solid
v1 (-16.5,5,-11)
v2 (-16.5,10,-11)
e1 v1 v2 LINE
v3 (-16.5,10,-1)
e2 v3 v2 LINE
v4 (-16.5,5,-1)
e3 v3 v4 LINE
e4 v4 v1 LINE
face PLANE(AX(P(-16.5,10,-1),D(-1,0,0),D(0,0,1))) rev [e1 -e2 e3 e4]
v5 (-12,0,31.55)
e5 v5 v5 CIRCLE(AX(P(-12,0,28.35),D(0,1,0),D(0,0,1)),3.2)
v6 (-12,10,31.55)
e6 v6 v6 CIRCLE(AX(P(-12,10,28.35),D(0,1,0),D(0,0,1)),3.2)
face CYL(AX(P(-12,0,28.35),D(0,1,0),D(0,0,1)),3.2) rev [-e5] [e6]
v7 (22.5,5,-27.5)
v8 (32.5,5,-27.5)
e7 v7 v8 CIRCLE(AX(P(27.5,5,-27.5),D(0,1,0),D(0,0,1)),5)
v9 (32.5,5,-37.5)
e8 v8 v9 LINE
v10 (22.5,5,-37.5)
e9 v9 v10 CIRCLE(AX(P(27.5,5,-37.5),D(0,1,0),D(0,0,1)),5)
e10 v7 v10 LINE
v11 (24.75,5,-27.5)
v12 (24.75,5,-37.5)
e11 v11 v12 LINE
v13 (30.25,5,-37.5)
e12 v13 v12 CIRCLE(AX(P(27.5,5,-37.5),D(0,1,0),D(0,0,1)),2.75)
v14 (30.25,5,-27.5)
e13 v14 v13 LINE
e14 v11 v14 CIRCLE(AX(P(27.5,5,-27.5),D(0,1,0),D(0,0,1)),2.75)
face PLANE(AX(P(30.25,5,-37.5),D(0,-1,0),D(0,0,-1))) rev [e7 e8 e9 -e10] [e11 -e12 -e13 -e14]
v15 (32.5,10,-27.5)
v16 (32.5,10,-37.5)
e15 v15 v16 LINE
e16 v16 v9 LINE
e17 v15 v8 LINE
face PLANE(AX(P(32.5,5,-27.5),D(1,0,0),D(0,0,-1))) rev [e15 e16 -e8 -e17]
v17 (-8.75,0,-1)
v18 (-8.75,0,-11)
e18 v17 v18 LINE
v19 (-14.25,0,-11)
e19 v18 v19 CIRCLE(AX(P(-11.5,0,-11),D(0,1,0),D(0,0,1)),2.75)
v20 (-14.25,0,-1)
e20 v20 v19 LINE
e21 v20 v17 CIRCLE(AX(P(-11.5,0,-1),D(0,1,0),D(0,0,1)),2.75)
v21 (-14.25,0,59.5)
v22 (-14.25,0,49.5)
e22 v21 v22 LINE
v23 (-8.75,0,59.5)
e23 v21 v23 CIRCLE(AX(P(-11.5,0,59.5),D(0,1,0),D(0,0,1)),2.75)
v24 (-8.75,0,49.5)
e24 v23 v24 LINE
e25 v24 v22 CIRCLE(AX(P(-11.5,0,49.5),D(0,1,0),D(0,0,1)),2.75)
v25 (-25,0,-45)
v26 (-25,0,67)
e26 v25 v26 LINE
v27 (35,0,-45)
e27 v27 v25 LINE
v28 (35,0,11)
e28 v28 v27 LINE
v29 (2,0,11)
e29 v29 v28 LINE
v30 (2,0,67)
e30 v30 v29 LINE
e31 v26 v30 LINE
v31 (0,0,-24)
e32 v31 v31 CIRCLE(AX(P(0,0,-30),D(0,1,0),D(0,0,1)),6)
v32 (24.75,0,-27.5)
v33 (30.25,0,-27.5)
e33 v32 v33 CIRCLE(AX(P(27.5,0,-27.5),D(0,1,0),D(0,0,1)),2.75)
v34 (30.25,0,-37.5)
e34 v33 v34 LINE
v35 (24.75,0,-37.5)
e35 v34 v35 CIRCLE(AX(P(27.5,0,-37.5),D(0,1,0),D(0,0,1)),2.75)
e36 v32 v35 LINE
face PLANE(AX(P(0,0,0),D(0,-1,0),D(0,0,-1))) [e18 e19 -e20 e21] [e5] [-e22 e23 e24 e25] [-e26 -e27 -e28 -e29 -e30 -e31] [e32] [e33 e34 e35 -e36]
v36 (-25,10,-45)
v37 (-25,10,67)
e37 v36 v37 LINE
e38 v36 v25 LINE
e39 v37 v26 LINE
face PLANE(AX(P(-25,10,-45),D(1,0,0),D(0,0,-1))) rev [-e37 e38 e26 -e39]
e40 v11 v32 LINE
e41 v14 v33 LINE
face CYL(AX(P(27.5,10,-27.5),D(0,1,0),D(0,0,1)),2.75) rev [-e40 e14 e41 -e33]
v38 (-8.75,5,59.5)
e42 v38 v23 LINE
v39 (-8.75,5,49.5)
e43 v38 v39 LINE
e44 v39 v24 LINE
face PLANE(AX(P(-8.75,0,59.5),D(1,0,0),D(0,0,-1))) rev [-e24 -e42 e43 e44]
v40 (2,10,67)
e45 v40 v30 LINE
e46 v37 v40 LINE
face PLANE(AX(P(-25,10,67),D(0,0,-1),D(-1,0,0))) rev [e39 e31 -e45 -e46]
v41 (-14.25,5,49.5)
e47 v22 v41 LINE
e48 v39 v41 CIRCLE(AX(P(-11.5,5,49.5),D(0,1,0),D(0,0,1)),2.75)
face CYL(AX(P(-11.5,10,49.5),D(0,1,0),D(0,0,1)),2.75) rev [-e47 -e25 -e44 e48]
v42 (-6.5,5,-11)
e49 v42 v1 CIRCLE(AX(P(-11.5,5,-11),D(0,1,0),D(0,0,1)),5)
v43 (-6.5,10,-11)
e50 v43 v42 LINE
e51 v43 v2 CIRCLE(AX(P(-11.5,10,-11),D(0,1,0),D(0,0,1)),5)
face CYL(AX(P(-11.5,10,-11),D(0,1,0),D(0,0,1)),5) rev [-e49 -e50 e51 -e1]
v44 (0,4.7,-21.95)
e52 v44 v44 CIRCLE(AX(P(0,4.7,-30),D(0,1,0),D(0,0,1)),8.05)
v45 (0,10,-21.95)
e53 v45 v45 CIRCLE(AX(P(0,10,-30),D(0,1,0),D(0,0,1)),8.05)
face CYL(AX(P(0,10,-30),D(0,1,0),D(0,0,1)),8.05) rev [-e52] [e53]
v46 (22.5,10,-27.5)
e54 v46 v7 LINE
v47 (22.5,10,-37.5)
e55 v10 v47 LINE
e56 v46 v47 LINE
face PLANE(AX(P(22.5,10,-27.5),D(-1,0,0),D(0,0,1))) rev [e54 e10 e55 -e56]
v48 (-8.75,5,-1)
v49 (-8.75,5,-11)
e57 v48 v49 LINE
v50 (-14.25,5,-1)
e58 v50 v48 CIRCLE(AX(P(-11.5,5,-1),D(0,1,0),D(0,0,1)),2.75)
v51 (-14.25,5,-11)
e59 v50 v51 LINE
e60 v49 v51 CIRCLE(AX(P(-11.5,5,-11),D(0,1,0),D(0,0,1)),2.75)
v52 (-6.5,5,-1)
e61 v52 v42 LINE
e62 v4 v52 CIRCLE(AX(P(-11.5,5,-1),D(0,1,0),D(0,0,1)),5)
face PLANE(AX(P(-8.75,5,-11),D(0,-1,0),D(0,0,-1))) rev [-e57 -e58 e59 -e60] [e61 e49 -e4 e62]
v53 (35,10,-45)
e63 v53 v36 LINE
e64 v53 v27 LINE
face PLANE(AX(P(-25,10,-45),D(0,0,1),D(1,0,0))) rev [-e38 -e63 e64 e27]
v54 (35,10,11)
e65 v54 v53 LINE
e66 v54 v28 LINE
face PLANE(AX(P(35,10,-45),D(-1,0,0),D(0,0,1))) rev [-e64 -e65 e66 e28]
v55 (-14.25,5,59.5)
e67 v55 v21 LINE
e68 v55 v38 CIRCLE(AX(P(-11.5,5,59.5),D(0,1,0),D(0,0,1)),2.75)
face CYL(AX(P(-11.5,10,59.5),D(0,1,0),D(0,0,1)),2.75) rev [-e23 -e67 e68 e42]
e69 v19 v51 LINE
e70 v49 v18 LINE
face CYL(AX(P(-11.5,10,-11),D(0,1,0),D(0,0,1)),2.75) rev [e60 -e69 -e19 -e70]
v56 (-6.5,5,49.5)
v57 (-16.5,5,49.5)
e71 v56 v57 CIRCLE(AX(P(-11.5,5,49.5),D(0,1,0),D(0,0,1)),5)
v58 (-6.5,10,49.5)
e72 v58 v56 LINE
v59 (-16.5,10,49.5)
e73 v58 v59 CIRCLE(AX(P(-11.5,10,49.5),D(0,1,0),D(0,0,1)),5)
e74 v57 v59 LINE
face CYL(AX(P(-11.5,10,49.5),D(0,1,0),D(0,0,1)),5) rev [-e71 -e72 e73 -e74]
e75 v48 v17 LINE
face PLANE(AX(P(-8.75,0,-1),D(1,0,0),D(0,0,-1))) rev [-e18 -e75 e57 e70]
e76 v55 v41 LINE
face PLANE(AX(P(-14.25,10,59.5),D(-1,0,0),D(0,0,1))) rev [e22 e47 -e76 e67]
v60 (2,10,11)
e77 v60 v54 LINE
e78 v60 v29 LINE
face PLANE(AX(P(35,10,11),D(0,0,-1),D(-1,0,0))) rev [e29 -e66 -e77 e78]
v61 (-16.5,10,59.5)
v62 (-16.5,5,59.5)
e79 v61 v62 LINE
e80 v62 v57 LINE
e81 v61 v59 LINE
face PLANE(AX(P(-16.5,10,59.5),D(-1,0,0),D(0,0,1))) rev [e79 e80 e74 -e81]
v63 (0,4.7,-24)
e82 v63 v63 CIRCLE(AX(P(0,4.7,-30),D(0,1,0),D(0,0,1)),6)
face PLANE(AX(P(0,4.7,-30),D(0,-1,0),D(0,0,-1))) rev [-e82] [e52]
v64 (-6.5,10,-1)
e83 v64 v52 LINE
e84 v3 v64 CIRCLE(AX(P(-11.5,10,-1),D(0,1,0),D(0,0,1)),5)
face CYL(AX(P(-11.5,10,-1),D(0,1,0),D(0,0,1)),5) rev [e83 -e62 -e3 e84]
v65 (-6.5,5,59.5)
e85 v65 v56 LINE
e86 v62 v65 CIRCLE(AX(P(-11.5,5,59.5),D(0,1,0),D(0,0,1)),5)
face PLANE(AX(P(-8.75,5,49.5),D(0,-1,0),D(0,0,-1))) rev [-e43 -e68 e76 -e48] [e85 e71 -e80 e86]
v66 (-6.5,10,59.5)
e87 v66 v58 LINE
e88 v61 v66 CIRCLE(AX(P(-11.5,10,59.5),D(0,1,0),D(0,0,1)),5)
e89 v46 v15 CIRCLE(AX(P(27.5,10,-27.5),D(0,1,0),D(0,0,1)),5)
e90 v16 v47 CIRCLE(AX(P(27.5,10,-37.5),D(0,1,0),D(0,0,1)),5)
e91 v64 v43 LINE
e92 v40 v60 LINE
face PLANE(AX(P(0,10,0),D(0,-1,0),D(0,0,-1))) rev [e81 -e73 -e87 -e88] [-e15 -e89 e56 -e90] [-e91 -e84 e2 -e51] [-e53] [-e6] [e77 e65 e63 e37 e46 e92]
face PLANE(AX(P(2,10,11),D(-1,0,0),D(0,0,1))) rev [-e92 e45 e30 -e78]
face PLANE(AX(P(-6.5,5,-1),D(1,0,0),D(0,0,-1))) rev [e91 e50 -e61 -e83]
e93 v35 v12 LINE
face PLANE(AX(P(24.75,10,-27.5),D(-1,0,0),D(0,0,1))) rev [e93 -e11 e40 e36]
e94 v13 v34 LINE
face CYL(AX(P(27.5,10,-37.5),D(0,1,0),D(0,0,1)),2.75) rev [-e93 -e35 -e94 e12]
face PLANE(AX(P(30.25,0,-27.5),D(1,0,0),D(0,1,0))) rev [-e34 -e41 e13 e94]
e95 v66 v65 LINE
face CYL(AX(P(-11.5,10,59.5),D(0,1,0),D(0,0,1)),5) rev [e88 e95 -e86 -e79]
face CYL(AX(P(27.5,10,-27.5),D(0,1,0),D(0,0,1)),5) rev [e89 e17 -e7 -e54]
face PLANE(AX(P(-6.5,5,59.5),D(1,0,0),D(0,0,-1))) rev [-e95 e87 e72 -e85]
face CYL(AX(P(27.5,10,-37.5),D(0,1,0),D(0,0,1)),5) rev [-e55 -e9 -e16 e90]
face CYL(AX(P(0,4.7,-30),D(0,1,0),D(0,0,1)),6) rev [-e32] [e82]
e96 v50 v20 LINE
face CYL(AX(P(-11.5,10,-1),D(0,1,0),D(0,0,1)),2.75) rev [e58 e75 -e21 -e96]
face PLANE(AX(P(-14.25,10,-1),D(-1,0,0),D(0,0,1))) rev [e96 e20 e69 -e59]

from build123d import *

# Parameters (mm, degrees)
BOSS_EXTRUDE1_DEPTH             = 10
CBORE_START                     = 5
CBORE_SLOT_FOR_M5_SHCS1_DEPTH   = 5
CBORE_SLOT_FOR_M5_SHCS1_2_DEPTH = 5
F_1_0MM_DOWEL_HOLE1_D           = 16.1
F_1_0MM_DOWEL_HOLE1_DEPTH       = 5.3
F_1_0MM_DOWEL_HOLE3_D           = 12
SKETCH14_R                      = 3.2
CUT_EXTRUDE1_DEPTH              = 77.249590163


# Read off the part's stored shape, not the designer's step: CBORE SLOT for M5 SHCS1
with BuildPart() as part:
    # Sketch1 → Boss-Extrude1 (new body)
    with BuildSketch(Plane(origin=(0, 0, 0), x_dir=(1, 0, 0), z_dir=(0, 1, 0))):
        Polygon((-25, 45), (35, 45), (35, -11), (2, -11), (2, -67), (-25, -67), align=None)
    extrude(amount=BOSS_EXTRUDE1_DEPTH)

    # CBORE SLOT for M5 SHCS1 outline → CBORE SLOT for M5 SHCS1 (cut)
    with BuildSketch(Plane(origin=(0, 0, 0), x_dir=(1, 0, 0), z_dir=(0, 1, 0)).offset(CBORE_START)):
        with BuildLine():
            Line((-6.5, -59.5), (-6.5, -49.5))
            ThreePointArc((-6.5, -49.5), (-11.5, -44.5), (-16.5, -49.5))
            Line((-16.5, -49.5), (-16.5, -59.5))
            ThreePointArc((-16.5, -59.5), (-11.5, -64.5), (-6.5, -59.5))
        make_face()
        with BuildLine():
            ThreePointArc((-6.5, 11), (-11.5, 16), (-16.5, 11))
            Line((-16.5, 11), (-16.5, 1))
            ThreePointArc((-16.5, 1), (-11.5, -4), (-6.5, 1))
            Line((-6.5, 1), (-6.5, 11))
        make_face()
        with BuildLine():
            Line((32.5, 27.5), (32.5, 37.5))
            ThreePointArc((32.5, 37.5), (27.5, 42.5), (22.5, 37.5))
            Line((22.5, 37.5), (22.5, 27.5))
            ThreePointArc((22.5, 27.5), (27.5, 22.5), (32.5, 27.5))
        make_face()
    extrude(amount=CBORE_SLOT_FOR_M5_SHCS1_DEPTH, mode=Mode.SUBTRACT)

    # CBORE SLOT for M5 SHCS1 2 outline → CBORE SLOT for M5 SHCS1 2 (cut)
    with BuildSketch(Plane(origin=(0, 0, 0), x_dir=(1, 0, 0), z_dir=(0, 1, 0))):
        with BuildLine():
            Line((-8.75, -59.5), (-8.75, -49.5))
            ThreePointArc((-8.75, -49.5), (-11.5, -46.75), (-14.25, -49.5))
            Line((-14.25, -49.5), (-14.25, -59.5))
            ThreePointArc((-14.25, -59.5), (-11.5, -62.25), (-8.75, -59.5))
        make_face()
        with BuildLine():
            ThreePointArc((-8.75, 11), (-11.5, 13.75), (-14.25, 11))
            Line((-14.25, 11), (-14.25, 1))
            ThreePointArc((-14.25, 1), (-11.5, -1.75), (-8.75, 1))
            Line((-8.75, 1), (-8.75, 11))
        make_face()
        with BuildLine():
            Line((30.25, 27.5), (30.25, 37.5))
            ThreePointArc((30.25, 37.5), (27.5, 40.25), (24.75, 37.5))
            Line((24.75, 37.5), (24.75, 27.5))
            ThreePointArc((24.75, 27.5), (27.5, 24.75), (30.25, 27.5))
        make_face()
    extrude(amount=CBORE_SLOT_FOR_M5_SHCS1_2_DEPTH, mode=Mode.SUBTRACT)

    # Ø1.0mm Dowel Hole1
    with Locations(Plane(origin=(0, 10, 0), x_dir=(1, 0, 0), z_dir=(0, 1, 0))):
        with Locations((0, 30)):
            Hole(F_1_0MM_DOWEL_HOLE1_D / 2, depth=F_1_0MM_DOWEL_HOLE1_DEPTH)

    # Ø1.0mm Dowel Hole3 (through all)
    with Locations(Plane(origin=(0, 4.7, 0), x_dir=(1, 0, 0), z_dir=(0, 1, 0))):
        with Locations((0, 30)):
            Hole(F_1_0MM_DOWEL_HOLE3_D / 2)

    # Sketch14 → Cut-Extrude1 (cut, through all)
    with BuildSketch(Plane(origin=(0, 10, 0), x_dir=(1, 0, 0), z_dir=(0, 1, 0))):
        with Locations((12, -28.35)):
            Circle(SKETCH14_R)
        with Locations(Location((-12, -28.35, 0), (0, 0, 270))):
            Circle(SKETCH14_R)
    extrude(amount=-CUT_EXTRUDE1_DEPTH, mode=Mode.SUBTRACT)


solid = part.part
